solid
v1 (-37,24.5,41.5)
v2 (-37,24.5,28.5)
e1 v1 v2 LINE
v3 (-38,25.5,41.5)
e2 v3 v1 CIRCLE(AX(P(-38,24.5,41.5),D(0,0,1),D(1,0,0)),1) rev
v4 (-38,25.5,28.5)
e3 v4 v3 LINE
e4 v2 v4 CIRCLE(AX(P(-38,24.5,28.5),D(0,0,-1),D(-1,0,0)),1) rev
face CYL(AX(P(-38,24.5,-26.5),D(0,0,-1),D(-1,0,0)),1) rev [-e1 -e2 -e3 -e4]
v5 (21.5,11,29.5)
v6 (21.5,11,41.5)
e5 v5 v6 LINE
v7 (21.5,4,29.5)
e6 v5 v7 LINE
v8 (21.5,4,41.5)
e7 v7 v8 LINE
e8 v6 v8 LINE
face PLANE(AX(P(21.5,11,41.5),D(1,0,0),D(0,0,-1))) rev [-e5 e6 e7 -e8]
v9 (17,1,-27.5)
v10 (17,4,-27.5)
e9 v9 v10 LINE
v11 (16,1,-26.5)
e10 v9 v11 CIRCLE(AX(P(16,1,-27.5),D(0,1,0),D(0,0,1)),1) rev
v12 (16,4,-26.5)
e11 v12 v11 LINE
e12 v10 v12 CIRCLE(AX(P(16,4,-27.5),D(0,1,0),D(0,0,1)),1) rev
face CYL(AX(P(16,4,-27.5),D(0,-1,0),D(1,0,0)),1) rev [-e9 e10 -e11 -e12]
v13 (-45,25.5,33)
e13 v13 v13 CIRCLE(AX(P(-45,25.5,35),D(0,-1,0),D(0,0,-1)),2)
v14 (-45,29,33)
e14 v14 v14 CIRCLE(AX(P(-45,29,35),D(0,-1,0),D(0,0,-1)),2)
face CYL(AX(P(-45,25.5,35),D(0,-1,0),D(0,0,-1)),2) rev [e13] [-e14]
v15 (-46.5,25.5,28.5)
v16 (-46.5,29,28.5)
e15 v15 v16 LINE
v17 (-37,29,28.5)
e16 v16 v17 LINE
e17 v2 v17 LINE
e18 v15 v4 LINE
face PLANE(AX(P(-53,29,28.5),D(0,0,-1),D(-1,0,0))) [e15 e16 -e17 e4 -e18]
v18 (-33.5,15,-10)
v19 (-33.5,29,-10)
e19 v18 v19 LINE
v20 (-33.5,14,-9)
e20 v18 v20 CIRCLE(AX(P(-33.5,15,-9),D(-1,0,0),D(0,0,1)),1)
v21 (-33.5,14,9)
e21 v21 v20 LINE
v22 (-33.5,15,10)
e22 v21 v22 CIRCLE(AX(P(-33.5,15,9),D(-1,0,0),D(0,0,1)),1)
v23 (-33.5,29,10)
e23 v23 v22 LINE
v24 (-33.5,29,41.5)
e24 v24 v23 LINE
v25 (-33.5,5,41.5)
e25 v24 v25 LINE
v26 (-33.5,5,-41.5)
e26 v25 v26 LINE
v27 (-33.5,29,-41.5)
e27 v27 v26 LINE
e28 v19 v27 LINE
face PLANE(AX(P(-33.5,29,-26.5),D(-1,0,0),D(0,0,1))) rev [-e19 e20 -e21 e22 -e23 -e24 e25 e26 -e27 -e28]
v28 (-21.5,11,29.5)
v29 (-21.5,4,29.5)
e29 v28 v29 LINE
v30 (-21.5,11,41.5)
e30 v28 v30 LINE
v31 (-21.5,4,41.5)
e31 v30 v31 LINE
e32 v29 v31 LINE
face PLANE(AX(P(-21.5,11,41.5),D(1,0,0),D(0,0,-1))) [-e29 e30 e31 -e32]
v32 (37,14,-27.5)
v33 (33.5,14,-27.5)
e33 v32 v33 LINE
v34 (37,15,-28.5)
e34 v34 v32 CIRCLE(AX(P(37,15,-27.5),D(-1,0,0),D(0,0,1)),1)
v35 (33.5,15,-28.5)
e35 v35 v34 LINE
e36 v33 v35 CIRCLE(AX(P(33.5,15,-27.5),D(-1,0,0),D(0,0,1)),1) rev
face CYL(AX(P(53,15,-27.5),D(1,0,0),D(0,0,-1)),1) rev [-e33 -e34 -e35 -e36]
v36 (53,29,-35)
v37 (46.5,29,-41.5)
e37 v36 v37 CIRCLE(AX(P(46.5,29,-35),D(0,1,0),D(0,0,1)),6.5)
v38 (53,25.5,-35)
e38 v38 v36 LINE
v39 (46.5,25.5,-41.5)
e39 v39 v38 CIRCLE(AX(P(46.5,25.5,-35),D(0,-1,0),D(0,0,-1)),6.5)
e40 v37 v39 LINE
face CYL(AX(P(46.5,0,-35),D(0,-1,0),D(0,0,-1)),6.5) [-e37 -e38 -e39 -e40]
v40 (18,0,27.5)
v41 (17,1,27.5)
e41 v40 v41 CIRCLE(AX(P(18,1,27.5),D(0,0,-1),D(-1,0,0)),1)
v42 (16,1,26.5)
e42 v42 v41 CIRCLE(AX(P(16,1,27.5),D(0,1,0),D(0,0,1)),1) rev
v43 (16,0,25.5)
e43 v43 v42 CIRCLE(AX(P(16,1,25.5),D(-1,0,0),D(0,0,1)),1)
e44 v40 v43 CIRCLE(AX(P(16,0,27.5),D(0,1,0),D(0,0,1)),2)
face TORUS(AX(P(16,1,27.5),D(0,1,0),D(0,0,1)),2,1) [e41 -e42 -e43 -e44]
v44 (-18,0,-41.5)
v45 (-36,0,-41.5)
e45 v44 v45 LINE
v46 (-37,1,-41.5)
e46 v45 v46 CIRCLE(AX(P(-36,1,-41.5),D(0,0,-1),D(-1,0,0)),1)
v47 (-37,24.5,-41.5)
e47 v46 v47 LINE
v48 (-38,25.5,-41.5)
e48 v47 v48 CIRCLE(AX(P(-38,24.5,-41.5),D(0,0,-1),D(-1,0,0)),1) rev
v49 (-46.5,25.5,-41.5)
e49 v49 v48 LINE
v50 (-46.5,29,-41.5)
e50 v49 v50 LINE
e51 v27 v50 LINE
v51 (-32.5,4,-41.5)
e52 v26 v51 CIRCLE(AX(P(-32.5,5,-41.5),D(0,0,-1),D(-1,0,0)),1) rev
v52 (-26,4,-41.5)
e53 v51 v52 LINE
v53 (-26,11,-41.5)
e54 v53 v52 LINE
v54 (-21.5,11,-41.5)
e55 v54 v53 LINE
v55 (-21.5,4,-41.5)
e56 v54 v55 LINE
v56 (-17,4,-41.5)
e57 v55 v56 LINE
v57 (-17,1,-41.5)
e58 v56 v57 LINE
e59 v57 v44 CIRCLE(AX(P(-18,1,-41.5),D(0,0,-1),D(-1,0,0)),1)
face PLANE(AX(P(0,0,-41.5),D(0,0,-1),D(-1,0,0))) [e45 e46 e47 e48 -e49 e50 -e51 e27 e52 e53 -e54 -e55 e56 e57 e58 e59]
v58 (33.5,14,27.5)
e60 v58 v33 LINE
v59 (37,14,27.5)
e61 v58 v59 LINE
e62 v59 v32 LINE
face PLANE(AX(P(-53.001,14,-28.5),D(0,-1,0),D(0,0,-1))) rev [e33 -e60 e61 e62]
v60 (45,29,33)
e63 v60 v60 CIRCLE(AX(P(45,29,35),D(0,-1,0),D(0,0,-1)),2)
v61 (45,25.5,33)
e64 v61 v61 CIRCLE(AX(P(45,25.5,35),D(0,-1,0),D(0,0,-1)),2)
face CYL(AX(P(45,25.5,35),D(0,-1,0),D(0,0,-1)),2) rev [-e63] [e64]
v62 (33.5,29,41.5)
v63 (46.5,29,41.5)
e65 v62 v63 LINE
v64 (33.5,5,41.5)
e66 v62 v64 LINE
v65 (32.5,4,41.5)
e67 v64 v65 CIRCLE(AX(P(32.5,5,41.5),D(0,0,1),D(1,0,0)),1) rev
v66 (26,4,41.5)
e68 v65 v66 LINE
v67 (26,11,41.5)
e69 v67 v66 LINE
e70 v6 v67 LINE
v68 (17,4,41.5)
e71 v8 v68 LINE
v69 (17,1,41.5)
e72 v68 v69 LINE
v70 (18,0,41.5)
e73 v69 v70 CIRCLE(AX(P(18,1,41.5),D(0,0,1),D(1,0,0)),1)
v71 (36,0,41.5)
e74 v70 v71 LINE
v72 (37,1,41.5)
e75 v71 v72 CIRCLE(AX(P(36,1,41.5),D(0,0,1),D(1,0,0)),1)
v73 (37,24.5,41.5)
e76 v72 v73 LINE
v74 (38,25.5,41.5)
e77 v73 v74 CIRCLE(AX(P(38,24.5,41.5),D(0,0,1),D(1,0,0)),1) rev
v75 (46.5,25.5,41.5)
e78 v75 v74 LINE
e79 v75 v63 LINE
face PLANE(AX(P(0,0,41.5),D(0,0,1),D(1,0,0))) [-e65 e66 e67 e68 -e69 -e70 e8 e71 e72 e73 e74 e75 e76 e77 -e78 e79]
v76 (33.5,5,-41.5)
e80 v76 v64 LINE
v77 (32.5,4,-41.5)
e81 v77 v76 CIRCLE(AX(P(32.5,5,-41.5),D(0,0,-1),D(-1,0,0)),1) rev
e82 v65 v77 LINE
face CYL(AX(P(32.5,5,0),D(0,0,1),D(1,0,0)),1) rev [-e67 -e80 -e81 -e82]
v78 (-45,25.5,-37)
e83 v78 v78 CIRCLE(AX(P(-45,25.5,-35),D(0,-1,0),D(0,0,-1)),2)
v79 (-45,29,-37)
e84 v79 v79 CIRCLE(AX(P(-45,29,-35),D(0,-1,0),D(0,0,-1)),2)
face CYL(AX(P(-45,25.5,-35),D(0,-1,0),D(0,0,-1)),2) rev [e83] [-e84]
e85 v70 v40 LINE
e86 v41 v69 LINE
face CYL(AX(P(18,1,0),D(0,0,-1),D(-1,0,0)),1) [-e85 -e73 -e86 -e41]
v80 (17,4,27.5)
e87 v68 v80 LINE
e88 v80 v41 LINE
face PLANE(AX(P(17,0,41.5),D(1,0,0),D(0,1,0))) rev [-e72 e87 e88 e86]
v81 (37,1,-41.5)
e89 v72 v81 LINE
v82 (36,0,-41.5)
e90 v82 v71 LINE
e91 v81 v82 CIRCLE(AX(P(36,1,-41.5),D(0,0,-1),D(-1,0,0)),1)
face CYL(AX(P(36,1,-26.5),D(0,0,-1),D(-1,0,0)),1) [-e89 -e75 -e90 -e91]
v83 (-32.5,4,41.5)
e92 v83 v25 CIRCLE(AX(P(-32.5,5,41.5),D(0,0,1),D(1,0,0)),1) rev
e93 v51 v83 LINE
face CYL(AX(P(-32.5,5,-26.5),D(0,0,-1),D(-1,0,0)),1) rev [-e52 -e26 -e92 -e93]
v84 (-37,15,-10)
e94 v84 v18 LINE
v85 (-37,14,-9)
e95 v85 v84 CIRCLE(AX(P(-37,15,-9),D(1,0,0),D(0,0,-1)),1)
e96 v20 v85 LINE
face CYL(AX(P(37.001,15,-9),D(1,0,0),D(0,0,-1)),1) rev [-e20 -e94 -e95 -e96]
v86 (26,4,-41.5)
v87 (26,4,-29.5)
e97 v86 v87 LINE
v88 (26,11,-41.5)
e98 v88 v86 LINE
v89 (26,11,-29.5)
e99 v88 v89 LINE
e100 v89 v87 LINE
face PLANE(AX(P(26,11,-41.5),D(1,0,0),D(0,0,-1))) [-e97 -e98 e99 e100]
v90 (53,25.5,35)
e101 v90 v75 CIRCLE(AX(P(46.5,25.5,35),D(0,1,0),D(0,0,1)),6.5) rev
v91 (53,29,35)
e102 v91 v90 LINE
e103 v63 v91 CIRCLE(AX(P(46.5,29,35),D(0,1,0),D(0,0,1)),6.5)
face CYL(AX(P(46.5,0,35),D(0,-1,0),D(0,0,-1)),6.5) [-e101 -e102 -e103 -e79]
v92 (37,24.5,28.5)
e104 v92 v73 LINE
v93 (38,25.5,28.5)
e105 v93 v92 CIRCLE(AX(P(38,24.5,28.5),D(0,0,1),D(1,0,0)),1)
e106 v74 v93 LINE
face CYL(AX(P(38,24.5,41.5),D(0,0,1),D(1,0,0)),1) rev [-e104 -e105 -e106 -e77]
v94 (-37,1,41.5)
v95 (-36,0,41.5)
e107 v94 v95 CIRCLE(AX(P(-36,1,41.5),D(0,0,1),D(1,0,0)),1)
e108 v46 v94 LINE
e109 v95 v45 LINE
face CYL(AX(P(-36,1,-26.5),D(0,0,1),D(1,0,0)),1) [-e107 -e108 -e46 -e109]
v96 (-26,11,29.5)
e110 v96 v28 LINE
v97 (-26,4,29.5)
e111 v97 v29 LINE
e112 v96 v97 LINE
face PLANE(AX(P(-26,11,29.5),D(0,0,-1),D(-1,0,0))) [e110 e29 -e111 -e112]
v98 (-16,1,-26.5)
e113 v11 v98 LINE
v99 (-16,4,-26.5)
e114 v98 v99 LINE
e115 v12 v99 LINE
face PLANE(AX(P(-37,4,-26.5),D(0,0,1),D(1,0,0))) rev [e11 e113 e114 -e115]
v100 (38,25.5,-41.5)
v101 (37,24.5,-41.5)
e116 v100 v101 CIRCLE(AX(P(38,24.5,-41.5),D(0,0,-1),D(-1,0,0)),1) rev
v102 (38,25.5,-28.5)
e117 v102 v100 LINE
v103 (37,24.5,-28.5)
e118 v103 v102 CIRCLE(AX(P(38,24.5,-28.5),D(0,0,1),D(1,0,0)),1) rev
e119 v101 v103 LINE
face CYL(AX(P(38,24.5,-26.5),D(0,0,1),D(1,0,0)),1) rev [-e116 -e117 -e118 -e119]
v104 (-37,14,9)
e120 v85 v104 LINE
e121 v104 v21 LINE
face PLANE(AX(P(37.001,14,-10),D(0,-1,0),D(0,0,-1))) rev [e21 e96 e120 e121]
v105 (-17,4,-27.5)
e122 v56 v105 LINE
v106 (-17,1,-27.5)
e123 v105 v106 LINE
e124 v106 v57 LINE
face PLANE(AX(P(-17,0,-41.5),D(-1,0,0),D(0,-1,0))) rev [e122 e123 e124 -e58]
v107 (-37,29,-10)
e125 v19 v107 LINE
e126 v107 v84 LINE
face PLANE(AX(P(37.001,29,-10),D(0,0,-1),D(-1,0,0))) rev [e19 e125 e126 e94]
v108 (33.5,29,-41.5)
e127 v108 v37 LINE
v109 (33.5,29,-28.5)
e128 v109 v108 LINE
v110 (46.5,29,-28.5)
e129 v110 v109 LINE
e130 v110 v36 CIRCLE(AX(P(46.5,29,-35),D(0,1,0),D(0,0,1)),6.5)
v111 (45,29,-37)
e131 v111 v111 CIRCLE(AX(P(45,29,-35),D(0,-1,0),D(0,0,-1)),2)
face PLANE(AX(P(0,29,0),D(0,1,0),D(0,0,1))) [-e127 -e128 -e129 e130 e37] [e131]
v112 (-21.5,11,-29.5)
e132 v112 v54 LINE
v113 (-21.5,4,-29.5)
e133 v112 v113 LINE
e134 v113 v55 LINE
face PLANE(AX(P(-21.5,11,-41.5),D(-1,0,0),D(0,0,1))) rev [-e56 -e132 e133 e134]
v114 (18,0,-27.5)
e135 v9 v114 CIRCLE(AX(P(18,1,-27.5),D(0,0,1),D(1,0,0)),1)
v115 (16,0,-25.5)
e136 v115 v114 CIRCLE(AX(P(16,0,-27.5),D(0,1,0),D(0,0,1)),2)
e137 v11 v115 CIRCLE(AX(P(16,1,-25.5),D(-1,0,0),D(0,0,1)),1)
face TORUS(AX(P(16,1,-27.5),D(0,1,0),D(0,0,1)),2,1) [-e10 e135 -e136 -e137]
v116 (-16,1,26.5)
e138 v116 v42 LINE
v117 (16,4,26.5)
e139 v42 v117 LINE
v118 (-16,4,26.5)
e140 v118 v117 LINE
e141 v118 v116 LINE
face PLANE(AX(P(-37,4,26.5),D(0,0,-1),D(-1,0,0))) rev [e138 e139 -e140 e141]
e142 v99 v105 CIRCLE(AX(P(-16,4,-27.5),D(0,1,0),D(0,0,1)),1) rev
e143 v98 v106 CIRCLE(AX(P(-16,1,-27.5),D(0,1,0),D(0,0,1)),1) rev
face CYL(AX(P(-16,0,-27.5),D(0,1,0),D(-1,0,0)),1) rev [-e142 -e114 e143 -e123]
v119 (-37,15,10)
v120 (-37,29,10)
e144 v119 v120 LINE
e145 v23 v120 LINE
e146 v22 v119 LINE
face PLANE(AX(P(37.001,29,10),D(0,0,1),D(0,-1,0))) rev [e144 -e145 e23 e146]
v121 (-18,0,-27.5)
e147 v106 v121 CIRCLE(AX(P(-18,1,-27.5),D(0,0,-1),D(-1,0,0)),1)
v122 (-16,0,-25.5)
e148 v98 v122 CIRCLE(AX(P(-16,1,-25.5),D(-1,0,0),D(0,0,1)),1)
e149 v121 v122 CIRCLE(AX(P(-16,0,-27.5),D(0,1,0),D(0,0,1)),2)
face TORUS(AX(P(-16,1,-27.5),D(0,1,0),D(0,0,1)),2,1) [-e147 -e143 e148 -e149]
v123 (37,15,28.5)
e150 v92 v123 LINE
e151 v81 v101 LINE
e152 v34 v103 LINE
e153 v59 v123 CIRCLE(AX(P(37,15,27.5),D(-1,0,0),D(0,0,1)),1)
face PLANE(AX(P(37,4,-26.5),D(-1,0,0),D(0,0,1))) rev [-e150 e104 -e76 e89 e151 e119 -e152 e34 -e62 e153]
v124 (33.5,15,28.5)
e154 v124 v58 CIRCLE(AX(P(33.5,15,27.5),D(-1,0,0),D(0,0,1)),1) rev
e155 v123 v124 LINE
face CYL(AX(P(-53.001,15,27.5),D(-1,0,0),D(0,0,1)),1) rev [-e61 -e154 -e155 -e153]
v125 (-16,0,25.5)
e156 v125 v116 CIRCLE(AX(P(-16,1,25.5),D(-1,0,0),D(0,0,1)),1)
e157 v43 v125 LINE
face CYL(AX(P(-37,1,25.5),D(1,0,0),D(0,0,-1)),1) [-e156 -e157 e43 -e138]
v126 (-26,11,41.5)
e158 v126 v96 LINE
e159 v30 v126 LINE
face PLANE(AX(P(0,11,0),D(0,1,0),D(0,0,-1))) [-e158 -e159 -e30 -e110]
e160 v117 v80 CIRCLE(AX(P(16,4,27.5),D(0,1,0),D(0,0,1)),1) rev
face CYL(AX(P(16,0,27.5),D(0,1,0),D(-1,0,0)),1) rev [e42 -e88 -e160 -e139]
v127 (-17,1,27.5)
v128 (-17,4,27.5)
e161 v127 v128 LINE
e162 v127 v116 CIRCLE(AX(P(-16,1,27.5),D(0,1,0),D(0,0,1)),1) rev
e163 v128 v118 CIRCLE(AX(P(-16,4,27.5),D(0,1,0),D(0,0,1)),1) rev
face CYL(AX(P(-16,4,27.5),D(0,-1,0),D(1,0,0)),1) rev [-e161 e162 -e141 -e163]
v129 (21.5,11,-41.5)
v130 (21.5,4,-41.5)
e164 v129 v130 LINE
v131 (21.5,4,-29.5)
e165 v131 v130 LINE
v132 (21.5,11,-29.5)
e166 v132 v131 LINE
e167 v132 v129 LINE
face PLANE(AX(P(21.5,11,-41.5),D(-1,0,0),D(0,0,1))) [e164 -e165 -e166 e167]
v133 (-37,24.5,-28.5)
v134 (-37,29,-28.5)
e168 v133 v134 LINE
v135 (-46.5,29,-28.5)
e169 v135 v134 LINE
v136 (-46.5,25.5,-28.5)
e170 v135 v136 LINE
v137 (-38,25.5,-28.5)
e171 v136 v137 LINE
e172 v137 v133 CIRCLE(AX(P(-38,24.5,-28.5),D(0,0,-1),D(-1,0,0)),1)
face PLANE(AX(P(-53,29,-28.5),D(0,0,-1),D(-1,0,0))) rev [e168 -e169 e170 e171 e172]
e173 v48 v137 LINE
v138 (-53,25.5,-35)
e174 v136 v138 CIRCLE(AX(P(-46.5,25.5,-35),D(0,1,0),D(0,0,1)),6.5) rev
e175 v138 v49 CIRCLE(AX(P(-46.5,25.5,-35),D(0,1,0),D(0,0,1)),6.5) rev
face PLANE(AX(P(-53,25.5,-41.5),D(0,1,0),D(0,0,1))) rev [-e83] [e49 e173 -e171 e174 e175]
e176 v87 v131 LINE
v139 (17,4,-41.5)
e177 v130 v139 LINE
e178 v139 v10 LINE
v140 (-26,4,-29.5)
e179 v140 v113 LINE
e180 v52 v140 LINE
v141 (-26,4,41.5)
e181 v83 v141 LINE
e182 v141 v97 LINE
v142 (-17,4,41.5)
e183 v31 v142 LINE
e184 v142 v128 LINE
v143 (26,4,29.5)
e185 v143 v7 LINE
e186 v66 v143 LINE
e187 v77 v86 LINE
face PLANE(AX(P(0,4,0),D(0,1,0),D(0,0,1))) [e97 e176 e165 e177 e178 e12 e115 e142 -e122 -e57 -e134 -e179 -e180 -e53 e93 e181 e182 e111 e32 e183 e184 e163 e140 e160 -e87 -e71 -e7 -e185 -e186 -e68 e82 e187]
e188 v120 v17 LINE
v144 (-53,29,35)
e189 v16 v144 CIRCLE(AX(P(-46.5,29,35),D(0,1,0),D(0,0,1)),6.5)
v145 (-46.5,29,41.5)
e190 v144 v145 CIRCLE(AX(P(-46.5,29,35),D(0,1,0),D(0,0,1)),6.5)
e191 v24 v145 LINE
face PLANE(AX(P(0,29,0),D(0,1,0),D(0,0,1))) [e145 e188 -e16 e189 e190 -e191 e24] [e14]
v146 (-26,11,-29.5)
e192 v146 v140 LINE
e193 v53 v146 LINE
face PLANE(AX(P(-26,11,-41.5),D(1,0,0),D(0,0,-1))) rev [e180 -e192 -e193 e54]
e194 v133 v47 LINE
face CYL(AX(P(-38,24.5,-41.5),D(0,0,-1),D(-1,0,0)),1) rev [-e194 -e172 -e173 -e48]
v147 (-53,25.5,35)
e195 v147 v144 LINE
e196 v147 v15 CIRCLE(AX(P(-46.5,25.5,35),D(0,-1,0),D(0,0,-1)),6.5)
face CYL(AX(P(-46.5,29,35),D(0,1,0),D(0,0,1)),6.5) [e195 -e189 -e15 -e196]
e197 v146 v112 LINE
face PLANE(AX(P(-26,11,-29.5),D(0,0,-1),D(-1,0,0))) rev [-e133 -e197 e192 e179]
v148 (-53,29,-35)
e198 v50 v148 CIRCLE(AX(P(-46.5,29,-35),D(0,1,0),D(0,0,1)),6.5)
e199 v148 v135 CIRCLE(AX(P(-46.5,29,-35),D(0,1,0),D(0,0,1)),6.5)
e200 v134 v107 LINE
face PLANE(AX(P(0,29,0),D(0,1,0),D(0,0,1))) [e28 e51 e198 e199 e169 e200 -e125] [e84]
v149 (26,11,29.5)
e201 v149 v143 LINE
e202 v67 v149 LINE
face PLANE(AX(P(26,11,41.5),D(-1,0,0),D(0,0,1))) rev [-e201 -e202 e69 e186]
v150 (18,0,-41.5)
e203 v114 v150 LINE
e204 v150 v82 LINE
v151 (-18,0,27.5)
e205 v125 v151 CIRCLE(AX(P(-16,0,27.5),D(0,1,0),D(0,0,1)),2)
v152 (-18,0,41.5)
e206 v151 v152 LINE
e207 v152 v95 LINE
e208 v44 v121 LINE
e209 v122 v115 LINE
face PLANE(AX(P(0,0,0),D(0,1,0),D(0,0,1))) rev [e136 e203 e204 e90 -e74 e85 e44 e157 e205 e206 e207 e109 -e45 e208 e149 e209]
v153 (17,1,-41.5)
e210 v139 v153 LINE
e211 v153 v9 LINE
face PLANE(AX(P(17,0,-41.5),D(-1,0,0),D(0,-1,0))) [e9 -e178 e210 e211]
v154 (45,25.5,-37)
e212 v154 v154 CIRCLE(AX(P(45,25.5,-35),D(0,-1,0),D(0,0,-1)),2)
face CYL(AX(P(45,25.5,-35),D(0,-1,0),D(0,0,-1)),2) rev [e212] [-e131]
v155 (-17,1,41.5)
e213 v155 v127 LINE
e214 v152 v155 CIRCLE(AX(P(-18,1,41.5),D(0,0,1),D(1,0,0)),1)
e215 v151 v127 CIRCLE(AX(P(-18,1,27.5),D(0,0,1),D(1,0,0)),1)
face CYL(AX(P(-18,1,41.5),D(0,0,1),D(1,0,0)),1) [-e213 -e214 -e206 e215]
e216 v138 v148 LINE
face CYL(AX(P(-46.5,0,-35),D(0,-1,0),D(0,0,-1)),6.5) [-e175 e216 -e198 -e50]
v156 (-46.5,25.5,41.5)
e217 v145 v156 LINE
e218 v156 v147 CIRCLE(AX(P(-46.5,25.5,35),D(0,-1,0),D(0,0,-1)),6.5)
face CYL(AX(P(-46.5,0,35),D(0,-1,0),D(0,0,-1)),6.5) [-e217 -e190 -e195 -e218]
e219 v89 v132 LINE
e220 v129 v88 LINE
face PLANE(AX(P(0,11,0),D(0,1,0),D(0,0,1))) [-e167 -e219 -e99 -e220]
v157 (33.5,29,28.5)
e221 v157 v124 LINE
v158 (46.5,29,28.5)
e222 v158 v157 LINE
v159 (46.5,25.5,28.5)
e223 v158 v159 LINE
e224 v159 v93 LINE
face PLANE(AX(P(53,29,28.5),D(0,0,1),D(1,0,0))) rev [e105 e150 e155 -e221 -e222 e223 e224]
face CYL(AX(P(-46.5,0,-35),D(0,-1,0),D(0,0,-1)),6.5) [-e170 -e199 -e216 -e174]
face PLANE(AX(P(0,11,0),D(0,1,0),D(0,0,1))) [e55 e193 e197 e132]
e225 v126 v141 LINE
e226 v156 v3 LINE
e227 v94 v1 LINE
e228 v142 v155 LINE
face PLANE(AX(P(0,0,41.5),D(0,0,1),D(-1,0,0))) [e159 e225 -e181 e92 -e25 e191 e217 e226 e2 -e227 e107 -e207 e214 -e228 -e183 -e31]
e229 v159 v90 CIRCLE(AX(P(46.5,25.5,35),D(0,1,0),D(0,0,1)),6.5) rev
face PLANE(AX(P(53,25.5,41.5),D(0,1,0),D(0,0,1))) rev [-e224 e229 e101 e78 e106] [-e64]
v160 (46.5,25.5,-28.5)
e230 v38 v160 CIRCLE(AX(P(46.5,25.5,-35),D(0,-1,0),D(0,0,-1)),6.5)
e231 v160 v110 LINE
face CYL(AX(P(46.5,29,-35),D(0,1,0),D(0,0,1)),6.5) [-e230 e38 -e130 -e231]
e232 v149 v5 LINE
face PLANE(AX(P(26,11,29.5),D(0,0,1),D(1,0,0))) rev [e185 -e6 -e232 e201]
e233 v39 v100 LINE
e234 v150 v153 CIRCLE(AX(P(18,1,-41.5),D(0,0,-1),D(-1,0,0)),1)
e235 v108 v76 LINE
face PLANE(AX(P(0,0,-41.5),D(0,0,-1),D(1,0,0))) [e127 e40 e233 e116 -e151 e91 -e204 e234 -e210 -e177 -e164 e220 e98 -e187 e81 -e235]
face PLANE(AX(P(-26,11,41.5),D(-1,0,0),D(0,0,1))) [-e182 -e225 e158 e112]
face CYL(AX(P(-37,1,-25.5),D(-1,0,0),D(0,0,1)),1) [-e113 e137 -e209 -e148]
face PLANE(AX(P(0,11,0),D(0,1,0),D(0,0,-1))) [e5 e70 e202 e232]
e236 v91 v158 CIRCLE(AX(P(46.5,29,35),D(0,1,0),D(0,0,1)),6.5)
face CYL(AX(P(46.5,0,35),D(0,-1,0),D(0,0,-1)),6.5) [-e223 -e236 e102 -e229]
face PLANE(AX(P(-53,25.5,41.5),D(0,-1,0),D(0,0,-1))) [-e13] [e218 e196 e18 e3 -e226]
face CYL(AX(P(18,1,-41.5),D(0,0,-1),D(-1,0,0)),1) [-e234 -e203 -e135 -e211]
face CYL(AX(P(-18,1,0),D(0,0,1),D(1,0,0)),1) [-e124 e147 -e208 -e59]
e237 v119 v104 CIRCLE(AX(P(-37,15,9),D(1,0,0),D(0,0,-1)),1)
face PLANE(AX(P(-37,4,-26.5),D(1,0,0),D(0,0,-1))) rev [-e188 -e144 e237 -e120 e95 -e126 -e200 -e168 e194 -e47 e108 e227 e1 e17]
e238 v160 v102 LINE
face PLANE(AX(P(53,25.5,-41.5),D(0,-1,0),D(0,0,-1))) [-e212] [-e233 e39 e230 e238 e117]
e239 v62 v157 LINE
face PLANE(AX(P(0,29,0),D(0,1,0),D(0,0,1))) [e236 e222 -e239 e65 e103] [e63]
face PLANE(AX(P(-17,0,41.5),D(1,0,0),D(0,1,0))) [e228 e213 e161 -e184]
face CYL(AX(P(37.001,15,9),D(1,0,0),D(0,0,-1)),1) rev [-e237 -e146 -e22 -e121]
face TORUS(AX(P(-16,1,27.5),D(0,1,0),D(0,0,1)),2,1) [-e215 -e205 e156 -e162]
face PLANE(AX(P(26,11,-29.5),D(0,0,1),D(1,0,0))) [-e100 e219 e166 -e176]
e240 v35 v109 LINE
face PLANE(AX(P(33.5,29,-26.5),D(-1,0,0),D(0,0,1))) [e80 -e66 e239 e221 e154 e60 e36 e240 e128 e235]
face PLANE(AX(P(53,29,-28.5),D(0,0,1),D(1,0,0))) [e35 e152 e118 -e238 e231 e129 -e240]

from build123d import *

# Parameters (mm, degrees)
SKETCH1_W                       = 74
SKETCH1_H                       = 53
BOSS_EXTRUDE1_DEPTH             = 4
SKETCH2_W                       = 3.5
SKETCH2_H                       = 53
BOSS_EXTRUDE2_DEPTH             = 25
CUT_EXTRUDE1_REACH              = 85.781
SKETCH3_W                       = 20
SKETCH3_H                       = 15
SKETCH5_W                       = 20
SKETCH5_H                       = 4
BOSS_EXTRUDE4_DEPTH             = 15
MIRROR4_COPY_1_SKETCH_W         = 20
MIRROR4_COPY_1_SKETCH_H         = 4
MIRROR4_COPY_1_DEPTH            = 15
SKETCH6_W                       = 3.5
SKETCH6_H                       = 15
BOSS_EXTRUDE5_DEPTH             = 25
MIRROR6_COPY_1_SKETCH_W         = 3.5
MIRROR6_COPY_1_SKETCH_H         = 15
MIRROR6_COPY_1_DEPTH            = 25
SKETCH7_W                       = 4.5
SKETCH7_H                       = 12
BOSS_EXTRUDE6_DEPTH             = 7
MIRROR8_COPY_1_SKETCH_W         = 4.5
MIRROR8_COPY_1_SKETCH_H         = 12
MIRROR8_COPY_1_DEPTH            = 7
SKETCH8_W                       = 13
SKETCH8_H                       = 3.5
BOSS_EXTRUDE7_DEPTH             = 16
MIRROR10_COPY_1_SKETCH_W        = 13
MIRROR10_COPY_1_SKETCH_H        = 3.5
MIRROR10_COPY_1_DEPTH           = 16
CUT_EXTRUDE2_REACH              = 105.263
SKETCH9_W                       = 57
SKETCH9_H                       = 15
F_4_0MM_CLEARANCE_DOWEL_HOLE1_D = 4
FILLET1_R                       = 6.5
FILLET2_R                       = 1
FILLET3_R                       = 1


with BuildPart() as part:
    # Sketch1 → Boss-Extrude1 (new body)
    with BuildSketch(Plane(origin=(0, 0, 0), x_dir=(1, 0, 0), z_dir=(0, 1, 0))):
        Rectangle(SKETCH1_W, SKETCH1_H)
    extrude(amount=BOSS_EXTRUDE1_DEPTH)

    # Sketch2 → Boss-Extrude2 (add)
    with BuildSketch(Plane(origin=(0, 4, 0), x_dir=(1, 0, 0), z_dir=(0, 1, 0))):
        with Locations((-35.25, 0)):
            Rectangle(SKETCH2_W, SKETCH2_H)
    boss_extrude2 = extrude(amount=BOSS_EXTRUDE2_DEPTH)

    # Mirror1: Boss-Extrude2 across plane
    add(boss_extrude2.mirror(Plane(origin=(0, 0, 0), x_dir=(0, 0, 1), z_dir=(1, 0, 0))))

    # Sketch3 → Cut-Extrude1 (cut, up to next)
    with BuildSketch(Plane.ZY.offset(37), mode=Mode.PRIVATE) as cut_extrude1_sk1:
        with Locations((0, 21.5)):
            Rectangle(SKETCH3_W, SKETCH3_H)
    cut_extrude1_tool1 = extrude(cut_extrude1_sk1.sketch, amount=-CUT_EXTRUDE1_REACH, mode=Mode.PRIVATE) & part.part
    add(cut_extrude1_tool1.solids().sort_by_distance((-37, 21.5, 0))[0], mode=Mode.SUBTRACT)

    # Sketch5 → Boss-Extrude4 (add)
    with BuildSketch(Plane(origin=(0, 0, -26.5), x_dir=(-1, 0, 0), z_dir=(0, 0, -1))):
        with Locations((27, 2)):
            Rectangle(SKETCH5_W, SKETCH5_H)
    boss_extrude4 = extrude(amount=BOSS_EXTRUDE4_DEPTH)

    # Mirror3: Boss-Extrude4 across plane
    add(boss_extrude4.mirror(Plane.XY))

    # Mirror4: Boss-Extrude4 across plane
    add(boss_extrude4.mirror(Plane(origin=(0, 0, 0), x_dir=(0, 0, 1), z_dir=(1, 0, 0))))

    # Mirror4 copy 1 sketch → Mirror4 copy 1 (add)
    with BuildSketch(Plane.XY.offset(26.5)):
        with Locations((27, 2)):
            Rectangle(MIRROR4_COPY_1_SKETCH_W, MIRROR4_COPY_1_SKETCH_H)
    extrude(amount=MIRROR4_COPY_1_DEPTH)

    # Sketch6 → Boss-Extrude5 (add)
    with BuildSketch(Plane(origin=(0, 4, 0), x_dir=(1, 0, 0), z_dir=(0, 1, 0))):
        with Locations((-35.25, 34)):
            Rectangle(SKETCH6_W, SKETCH6_H)
    boss_extrude5 = extrude(amount=BOSS_EXTRUDE5_DEPTH)

    # Mirror5: Boss-Extrude5 across plane
    add(boss_extrude5.mirror(Plane.XY))

    # Mirror6: Boss-Extrude5 across plane
    add(boss_extrude5.mirror(Plane(origin=(0, 0, 0), x_dir=(0, 0, 1), z_dir=(1, 0, 0))))

    # Mirror6 copy 1 sketch → Mirror6 copy 1 (add)
    with BuildSketch(Plane(origin=(0, 4, 0), x_dir=(-1, 0, 0), z_dir=(0, 1, 0))):
        with Locations((-35.25, 34)):
            Rectangle(MIRROR6_COPY_1_SKETCH_W, MIRROR6_COPY_1_SKETCH_H)
    extrude(amount=MIRROR6_COPY_1_DEPTH)

    # Sketch7 → Boss-Extrude6 (add)
    with BuildSketch(Plane(origin=(0, 4, 0), x_dir=(1, 0, 0), z_dir=(0, 1, 0))):
        with Locations((-23.75, 35.5)):
            Rectangle(SKETCH7_W, SKETCH7_H)
    boss_extrude6 = extrude(amount=BOSS_EXTRUDE6_DEPTH)

    # Mirror7: Boss-Extrude6 across plane
    add(boss_extrude6.mirror(Plane.XY))

    # Mirror8: Boss-Extrude6 across plane
    add(boss_extrude6.mirror(Plane(origin=(0, 0, 0), x_dir=(0, 0, 1), z_dir=(1, 0, 0))))

    # Mirror8 copy 1 sketch → Mirror8 copy 1 (add)
    with BuildSketch(Plane(origin=(0, 4, 0), x_dir=(-1, 0, 0), z_dir=(0, 1, 0))):
        with Locations((-23.75, 35.5)):
            Rectangle(MIRROR8_COPY_1_SKETCH_W, MIRROR8_COPY_1_SKETCH_H)
    extrude(amount=MIRROR8_COPY_1_DEPTH)

    # Sketch8 → Boss-Extrude7 (add)
    with BuildSketch(Plane.ZY.offset(37)):
        with Locations((-35, 27.25)):
            Rectangle(SKETCH8_W, SKETCH8_H)
    boss_extrude7 = extrude(amount=BOSS_EXTRUDE7_DEPTH)

    # Mirror9: Boss-Extrude7 across plane
    add(boss_extrude7.mirror(Plane.XY))

    # Mirror10: Boss-Extrude7 across plane
    add(boss_extrude7.mirror(Plane(origin=(0, 0, 0), x_dir=(0, 0, 1), z_dir=(1, 0, 0))))

    # Mirror10 copy 1 sketch → Mirror10 copy 1 (add)
    with BuildSketch(Plane(origin=(37, 0, 0), x_dir=(0, 0, -1), z_dir=(1, 0, 0))):
        with Locations((-35, 27.25)):
            Rectangle(MIRROR10_COPY_1_SKETCH_W, MIRROR10_COPY_1_SKETCH_H)
    extrude(amount=MIRROR10_COPY_1_DEPTH)

    # Sketch9 → Cut-Extrude2 (cut, up to next)
    with BuildSketch(Plane(origin=(37, 0, 0), x_dir=(0, 0, -1), z_dir=(1, 0, 0)), mode=Mode.PRIVATE) as cut_extrude2_sk1:
        with Locations((0, 21.5)):
            Rectangle(SKETCH9_W, SKETCH9_H)
    cut_extrude2_tool1 = extrude(cut_extrude2_sk1.sketch, amount=-CUT_EXTRUDE2_REACH, mode=Mode.PRIVATE) & part.part
    add(cut_extrude2_tool1.solids().sort_by_distance((37, 21.5, 0))[0], mode=Mode.SUBTRACT)

    # Ø4.0mm Clearance Dowel Hole1 (through all)
    with Locations(Plane(origin=(0, 25.5, 0), x_dir=(-1, 0, 0), z_dir=(0, -1, 0))):
        with Locations((-45, 35), (-45, -35), (45, 35), (45, -35)):
            Hole(F_4_0MM_CLEARANCE_DOWEL_HOLE1_D / 2)

    # Fillet1
    # the kernel refuses this fillet: 6.5 mm, written as the material it takes off along each edge
    with BuildSketch(Plane(origin=(53, 45.25, -28.5), x_dir=(0, 0, -1), z_dir=(0, -1, 0)), Plane(origin=(53, 45.25, 28.5), x_dir=(-1, 0, 0), z_dir=(0, -1, 0)), Plane(origin=(53, 9.25, 41.5), x_dir=(-1, 0, 0), z_dir=(0, 1, 0)), Plane(origin=(-53, 9.25, -41.5), x_dir=(1, 0, 0), z_dir=(0, 1, 0)), Plane(origin=(-53, 45.25, -28.5), x_dir=(1, 0, 0), z_dir=(0, -1, 0))) as fillet1_piece_1:
        with BuildLine():
            CenterArc((FILLET1_R, -FILLET1_R), FILLET1_R, 90, 90)
            Line((0, -FILLET1_R), (0, 0))
            Line((0, 0), (FILLET1_R, 0))
        make_face()
    extrude(amount=36, mode=Mode.SUBTRACT)
    with BuildSketch(Plane(origin=(53, 9.25, -41.5), x_dir=(-1, 0, 0), z_dir=(0, 1, 0)), Plane(origin=(-53, 45.25, 28.5), x_dir=(1, 0, 0), z_dir=(0, -1, 0)), Plane(origin=(-53, 9.25, 41.5), x_dir=(1, 0, 0), z_dir=(0, 1, 0))) as fillet1_piece_2:
        with BuildLine():
            CenterArc((FILLET1_R, FILLET1_R), FILLET1_R, 180, 90)
            Line((0, FILLET1_R), (0, 0))
            Line((0, 0), (FILLET1_R, 0))
        make_face()
    extrude(amount=36, mode=Mode.SUBTRACT)

    # Fillet2
    fillet2_edges = [part.edges().sort_by_distance(p)[0] for p in [
        (-33.5, 4, 0),
        (-37, 25.5, -35),
        (-37, 25.5, 35),
        (37, 25.5, 35),
        (37, 25.5, -35),
        (35.25, 14, 28.5),
        (35.25, 14, -28.5),
        (33.5, 4, 0),
        (-35.25, 14, -10),
        (-35.25, 14, 10),
        (-17, 2, -26.5),
        (-17, 2, 26.5),
        (17, 2, 26.5),
        (17, 2, -26.5),
    ]]
    fillet(fillet2_edges, radius=FILLET2_R)

    # Fillet3
    fillet3_edges = [part.edges().sort_by_distance(p)[0] for p in [
        (0, 0, -26.5),
        (0, 0, 26.5),
        (16.707106781, 0, -26.792893219),
        (-16.707106781, 0, -26.792893219),
        (-16.707106781, 0, 26.792893219),
        (16.707106781, 0, 26.792893219),
        (-37, 0, 0),
        (37, 0, 0),
        (-17, 0, -34.5),
        (-17, 0, 34.5),
        (17, 0, 34.5),
        (17, 0, -34.5),
    ]]
    fillet(fillet3_edges, radius=FILLET3_R)


solid = part.part
